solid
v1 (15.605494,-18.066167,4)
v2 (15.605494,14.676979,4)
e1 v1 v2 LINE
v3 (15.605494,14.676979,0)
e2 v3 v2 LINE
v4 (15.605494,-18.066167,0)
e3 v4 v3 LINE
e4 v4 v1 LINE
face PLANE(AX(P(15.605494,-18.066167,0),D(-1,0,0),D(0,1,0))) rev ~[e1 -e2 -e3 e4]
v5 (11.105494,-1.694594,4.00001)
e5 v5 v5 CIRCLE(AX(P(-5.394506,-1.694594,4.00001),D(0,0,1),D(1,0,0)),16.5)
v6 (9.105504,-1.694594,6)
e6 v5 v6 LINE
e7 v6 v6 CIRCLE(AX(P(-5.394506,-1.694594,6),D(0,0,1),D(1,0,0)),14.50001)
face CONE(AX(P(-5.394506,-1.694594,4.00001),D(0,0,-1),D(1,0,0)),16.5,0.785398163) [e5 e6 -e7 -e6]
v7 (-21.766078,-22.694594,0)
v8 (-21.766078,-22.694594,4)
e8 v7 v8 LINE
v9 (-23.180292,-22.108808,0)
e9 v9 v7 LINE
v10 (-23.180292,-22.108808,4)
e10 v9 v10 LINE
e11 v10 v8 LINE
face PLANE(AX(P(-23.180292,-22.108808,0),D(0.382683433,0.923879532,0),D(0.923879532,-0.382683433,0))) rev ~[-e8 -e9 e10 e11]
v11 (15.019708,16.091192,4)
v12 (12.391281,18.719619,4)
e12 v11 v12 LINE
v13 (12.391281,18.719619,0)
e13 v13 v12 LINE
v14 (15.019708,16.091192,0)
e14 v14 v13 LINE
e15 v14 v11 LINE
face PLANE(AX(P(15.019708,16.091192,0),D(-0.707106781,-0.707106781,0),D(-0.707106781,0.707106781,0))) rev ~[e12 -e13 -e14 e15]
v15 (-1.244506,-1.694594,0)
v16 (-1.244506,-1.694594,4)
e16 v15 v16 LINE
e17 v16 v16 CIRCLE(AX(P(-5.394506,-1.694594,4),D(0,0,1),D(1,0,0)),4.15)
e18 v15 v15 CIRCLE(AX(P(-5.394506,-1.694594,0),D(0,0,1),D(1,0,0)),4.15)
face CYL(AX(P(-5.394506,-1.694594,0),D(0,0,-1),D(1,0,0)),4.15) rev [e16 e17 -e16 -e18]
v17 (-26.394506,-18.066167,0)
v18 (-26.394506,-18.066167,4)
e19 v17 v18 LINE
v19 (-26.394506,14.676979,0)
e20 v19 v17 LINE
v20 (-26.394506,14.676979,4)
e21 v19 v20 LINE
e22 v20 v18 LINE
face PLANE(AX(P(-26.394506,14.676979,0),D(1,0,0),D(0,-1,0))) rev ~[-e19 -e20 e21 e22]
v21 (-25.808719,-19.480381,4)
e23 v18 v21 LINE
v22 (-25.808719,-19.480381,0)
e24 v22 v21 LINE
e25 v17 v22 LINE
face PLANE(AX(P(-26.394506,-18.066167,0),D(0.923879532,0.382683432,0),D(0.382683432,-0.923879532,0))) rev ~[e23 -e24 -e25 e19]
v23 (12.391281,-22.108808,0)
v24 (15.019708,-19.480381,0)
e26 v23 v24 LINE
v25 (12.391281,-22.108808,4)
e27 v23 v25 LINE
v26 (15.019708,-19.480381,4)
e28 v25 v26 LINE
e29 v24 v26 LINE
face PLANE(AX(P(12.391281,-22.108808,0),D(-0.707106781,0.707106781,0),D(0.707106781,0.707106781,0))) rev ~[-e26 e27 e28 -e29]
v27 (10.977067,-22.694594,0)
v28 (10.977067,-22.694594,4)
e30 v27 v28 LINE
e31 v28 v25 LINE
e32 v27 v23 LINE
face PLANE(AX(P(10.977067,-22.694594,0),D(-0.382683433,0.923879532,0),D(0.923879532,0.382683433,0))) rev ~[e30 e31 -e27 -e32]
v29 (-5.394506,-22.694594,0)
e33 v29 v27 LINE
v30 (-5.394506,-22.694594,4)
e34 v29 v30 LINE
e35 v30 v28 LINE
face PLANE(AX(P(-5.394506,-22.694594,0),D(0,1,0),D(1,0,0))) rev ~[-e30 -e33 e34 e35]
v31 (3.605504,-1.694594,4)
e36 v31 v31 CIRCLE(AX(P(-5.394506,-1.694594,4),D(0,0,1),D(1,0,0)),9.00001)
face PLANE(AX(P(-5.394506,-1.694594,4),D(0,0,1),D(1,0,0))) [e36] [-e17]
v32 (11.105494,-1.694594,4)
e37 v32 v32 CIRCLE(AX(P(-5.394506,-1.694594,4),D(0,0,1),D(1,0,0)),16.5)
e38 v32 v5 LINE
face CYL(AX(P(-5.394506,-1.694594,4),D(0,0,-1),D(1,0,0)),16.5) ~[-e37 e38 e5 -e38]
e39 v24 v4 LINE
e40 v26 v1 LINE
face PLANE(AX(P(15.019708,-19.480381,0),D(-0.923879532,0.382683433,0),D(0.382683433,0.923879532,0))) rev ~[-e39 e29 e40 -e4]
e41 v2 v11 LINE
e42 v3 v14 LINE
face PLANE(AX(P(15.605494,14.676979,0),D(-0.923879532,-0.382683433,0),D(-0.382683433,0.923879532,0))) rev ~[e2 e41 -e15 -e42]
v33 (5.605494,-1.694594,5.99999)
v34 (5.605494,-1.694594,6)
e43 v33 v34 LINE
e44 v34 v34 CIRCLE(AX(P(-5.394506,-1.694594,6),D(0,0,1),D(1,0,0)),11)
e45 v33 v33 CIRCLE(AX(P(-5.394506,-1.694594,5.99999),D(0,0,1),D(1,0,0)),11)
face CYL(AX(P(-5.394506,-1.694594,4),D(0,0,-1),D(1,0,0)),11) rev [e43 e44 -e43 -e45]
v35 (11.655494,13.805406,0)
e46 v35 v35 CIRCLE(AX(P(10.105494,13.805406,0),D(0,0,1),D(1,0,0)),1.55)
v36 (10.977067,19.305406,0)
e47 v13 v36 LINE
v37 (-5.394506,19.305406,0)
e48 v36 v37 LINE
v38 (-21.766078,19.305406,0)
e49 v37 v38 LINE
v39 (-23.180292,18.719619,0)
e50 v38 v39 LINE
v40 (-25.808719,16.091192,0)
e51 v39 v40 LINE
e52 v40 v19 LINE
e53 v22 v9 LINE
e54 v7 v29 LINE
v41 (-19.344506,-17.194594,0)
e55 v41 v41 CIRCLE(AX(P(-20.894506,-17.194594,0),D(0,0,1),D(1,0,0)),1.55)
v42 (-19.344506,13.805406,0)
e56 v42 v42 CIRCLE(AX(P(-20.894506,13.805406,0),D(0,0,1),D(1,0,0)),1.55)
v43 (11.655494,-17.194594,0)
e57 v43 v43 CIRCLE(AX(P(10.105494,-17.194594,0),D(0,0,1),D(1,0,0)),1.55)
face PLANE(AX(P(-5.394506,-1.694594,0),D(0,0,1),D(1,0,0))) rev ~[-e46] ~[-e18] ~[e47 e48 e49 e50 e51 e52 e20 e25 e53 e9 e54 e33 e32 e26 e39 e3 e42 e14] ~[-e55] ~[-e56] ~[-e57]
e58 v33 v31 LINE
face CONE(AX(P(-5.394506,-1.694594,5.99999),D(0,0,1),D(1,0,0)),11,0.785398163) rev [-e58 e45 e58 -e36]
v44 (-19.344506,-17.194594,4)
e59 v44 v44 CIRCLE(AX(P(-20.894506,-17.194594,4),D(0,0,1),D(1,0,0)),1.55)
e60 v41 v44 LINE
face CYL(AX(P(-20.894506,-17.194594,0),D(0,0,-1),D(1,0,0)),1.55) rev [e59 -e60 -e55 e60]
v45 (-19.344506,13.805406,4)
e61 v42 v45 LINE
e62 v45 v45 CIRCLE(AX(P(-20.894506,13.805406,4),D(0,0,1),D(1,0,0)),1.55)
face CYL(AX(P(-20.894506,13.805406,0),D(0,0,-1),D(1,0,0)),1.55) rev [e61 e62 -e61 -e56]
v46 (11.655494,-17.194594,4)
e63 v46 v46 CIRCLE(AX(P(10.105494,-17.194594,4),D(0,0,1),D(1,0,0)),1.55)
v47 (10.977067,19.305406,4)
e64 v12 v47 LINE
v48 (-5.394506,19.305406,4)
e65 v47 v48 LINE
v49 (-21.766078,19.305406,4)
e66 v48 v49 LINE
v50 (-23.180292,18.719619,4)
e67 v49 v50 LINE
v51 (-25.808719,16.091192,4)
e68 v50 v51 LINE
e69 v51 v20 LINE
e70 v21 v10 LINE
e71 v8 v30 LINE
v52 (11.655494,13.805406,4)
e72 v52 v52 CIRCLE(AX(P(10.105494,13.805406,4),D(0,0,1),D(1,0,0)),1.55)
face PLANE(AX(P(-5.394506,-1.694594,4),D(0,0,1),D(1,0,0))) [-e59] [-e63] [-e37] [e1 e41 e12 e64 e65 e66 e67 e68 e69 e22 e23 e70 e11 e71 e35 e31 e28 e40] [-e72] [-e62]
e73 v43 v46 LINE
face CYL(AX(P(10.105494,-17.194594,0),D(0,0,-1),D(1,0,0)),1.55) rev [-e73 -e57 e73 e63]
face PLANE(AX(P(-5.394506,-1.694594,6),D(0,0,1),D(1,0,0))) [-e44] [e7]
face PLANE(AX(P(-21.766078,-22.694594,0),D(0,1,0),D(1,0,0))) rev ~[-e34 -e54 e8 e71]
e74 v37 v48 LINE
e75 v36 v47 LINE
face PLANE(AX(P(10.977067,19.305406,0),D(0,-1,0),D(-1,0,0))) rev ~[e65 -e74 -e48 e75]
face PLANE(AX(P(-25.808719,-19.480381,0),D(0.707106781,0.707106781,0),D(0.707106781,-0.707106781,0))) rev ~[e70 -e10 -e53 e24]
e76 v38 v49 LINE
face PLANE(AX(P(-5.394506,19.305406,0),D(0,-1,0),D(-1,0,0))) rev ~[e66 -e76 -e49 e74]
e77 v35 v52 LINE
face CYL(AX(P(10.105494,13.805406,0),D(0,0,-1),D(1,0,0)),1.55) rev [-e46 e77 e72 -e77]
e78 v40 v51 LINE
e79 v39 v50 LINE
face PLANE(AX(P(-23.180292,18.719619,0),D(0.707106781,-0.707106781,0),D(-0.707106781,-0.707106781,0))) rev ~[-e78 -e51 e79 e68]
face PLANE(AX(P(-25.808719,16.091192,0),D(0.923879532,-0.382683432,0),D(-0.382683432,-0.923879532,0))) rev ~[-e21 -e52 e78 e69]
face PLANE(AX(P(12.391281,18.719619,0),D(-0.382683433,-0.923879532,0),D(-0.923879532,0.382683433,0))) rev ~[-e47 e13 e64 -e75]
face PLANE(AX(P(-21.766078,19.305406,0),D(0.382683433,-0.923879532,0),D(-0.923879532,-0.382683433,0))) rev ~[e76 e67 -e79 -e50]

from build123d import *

# Parameters (mm, degrees)
F0_R     = 1.55
F0_R_2   = 16.5
F0_R_3   = 11.0000000003
F0_R_4   = 4.1499999994
F1_DEPTH = 4
F2_R     = 16.5
F2_R_2   = 11.0000000003
F3_DEPTH = 2
F4_SIZE  = 1.99999
F5_SIZE  = 1.99999


# Not quite as in the source:
# - a fillet or chamfer is up to 0.001 mm smaller than in the source, because OpenCascade refuses the exact size


with BuildPart() as f1:
    # F0 (on Top) → F1 (new body)
    with BuildSketch(Plane.XY):
        Polygon((10.9770673246, 19.3054056901), (-5.3945055504, 19.3054056901), (-21.7660784254, 19.3054056904), (-23.1802919884, 18.7196192521), (-25.8087191127, 16.0911921274), (-26.3945055504, 14.6769785651), (-26.3945055504, -18.0661671849), (-25.8087191127, -19.4803807472), (-23.1802919884, -22.1088078719), (-21.7660784254, -22.6945943101), (-5.3945055504, -22.6945943099), (10.9770673246, -22.6945943084), (12.3912808869, -22.1088078705), (15.0197080109, -19.4803807465), (15.6054944488, -18.0661671842), (15.6054944488, 14.6769785659), (15.0197080109, 16.0911921281), (12.3912808869, 18.7196192521), align=None)
        with Locations((-20.8945055404, -17.1945943099)):
            Circle(F0_R, mode=Mode.SUBTRACT)
        with Locations((-5.3945055504, -1.6945943099)):
            Circle(F0_R_2, mode=Mode.SUBTRACT)
        with Locations((10.1054944396, -17.1945943099)):
            Circle(F0_R, mode=Mode.SUBTRACT)
        with Locations((-20.8945055501, 13.8054056901)):
            Circle(F0_R, mode=Mode.SUBTRACT)
        with Locations((10.1054944396, 13.8054056901)):
            Circle(F0_R, mode=Mode.SUBTRACT)
        with Locations((-5.3945055504, -1.6945943099)):
            Circle(F0_R_2)
        with Locations((-5.3945055504, -1.6945943099)):
            Circle(F0_R_3, mode=Mode.SUBTRACT)
        with Locations((-5.3945055504, -1.6945943099)):
            Circle(F0_R_3)
        with Locations((-5.3945055504, -1.6945943099)):
            Circle(F0_R_4, mode=Mode.SUBTRACT)
    extrude(amount=F1_DEPTH)

    # F2 (on face) → F3 (join)
    with BuildSketch(Plane.XY.offset(4)):
        with Locations((-5.3945055504, -1.6945943099)):
            Circle(F2_R)
        with Locations((-5.3945055504, -1.6945943099)):
            Circle(F2_R_2, mode=Mode.SUBTRACT)
    extrude(amount=F3_DEPTH)

    # F4 (size 2 in the source; OpenCascade refuses exactly that, so slightly less here)
    f4_edges = [f1.edges().sort_by_distance(p)[0] for p in [
        (-21.894506, -1.694594, 6),
    ]]
    chamfer(f4_edges, length=F4_SIZE)

    # F5 (size 2 in the source; OpenCascade refuses exactly that, so slightly less here)
    f5_edges = [f1.edges().sort_by_distance(p)[0] for p in [
        (-16.394506, -1.694594, 4),
    ]]
    chamfer(f5_edges, length=F5_SIZE)


solid = f1.part
